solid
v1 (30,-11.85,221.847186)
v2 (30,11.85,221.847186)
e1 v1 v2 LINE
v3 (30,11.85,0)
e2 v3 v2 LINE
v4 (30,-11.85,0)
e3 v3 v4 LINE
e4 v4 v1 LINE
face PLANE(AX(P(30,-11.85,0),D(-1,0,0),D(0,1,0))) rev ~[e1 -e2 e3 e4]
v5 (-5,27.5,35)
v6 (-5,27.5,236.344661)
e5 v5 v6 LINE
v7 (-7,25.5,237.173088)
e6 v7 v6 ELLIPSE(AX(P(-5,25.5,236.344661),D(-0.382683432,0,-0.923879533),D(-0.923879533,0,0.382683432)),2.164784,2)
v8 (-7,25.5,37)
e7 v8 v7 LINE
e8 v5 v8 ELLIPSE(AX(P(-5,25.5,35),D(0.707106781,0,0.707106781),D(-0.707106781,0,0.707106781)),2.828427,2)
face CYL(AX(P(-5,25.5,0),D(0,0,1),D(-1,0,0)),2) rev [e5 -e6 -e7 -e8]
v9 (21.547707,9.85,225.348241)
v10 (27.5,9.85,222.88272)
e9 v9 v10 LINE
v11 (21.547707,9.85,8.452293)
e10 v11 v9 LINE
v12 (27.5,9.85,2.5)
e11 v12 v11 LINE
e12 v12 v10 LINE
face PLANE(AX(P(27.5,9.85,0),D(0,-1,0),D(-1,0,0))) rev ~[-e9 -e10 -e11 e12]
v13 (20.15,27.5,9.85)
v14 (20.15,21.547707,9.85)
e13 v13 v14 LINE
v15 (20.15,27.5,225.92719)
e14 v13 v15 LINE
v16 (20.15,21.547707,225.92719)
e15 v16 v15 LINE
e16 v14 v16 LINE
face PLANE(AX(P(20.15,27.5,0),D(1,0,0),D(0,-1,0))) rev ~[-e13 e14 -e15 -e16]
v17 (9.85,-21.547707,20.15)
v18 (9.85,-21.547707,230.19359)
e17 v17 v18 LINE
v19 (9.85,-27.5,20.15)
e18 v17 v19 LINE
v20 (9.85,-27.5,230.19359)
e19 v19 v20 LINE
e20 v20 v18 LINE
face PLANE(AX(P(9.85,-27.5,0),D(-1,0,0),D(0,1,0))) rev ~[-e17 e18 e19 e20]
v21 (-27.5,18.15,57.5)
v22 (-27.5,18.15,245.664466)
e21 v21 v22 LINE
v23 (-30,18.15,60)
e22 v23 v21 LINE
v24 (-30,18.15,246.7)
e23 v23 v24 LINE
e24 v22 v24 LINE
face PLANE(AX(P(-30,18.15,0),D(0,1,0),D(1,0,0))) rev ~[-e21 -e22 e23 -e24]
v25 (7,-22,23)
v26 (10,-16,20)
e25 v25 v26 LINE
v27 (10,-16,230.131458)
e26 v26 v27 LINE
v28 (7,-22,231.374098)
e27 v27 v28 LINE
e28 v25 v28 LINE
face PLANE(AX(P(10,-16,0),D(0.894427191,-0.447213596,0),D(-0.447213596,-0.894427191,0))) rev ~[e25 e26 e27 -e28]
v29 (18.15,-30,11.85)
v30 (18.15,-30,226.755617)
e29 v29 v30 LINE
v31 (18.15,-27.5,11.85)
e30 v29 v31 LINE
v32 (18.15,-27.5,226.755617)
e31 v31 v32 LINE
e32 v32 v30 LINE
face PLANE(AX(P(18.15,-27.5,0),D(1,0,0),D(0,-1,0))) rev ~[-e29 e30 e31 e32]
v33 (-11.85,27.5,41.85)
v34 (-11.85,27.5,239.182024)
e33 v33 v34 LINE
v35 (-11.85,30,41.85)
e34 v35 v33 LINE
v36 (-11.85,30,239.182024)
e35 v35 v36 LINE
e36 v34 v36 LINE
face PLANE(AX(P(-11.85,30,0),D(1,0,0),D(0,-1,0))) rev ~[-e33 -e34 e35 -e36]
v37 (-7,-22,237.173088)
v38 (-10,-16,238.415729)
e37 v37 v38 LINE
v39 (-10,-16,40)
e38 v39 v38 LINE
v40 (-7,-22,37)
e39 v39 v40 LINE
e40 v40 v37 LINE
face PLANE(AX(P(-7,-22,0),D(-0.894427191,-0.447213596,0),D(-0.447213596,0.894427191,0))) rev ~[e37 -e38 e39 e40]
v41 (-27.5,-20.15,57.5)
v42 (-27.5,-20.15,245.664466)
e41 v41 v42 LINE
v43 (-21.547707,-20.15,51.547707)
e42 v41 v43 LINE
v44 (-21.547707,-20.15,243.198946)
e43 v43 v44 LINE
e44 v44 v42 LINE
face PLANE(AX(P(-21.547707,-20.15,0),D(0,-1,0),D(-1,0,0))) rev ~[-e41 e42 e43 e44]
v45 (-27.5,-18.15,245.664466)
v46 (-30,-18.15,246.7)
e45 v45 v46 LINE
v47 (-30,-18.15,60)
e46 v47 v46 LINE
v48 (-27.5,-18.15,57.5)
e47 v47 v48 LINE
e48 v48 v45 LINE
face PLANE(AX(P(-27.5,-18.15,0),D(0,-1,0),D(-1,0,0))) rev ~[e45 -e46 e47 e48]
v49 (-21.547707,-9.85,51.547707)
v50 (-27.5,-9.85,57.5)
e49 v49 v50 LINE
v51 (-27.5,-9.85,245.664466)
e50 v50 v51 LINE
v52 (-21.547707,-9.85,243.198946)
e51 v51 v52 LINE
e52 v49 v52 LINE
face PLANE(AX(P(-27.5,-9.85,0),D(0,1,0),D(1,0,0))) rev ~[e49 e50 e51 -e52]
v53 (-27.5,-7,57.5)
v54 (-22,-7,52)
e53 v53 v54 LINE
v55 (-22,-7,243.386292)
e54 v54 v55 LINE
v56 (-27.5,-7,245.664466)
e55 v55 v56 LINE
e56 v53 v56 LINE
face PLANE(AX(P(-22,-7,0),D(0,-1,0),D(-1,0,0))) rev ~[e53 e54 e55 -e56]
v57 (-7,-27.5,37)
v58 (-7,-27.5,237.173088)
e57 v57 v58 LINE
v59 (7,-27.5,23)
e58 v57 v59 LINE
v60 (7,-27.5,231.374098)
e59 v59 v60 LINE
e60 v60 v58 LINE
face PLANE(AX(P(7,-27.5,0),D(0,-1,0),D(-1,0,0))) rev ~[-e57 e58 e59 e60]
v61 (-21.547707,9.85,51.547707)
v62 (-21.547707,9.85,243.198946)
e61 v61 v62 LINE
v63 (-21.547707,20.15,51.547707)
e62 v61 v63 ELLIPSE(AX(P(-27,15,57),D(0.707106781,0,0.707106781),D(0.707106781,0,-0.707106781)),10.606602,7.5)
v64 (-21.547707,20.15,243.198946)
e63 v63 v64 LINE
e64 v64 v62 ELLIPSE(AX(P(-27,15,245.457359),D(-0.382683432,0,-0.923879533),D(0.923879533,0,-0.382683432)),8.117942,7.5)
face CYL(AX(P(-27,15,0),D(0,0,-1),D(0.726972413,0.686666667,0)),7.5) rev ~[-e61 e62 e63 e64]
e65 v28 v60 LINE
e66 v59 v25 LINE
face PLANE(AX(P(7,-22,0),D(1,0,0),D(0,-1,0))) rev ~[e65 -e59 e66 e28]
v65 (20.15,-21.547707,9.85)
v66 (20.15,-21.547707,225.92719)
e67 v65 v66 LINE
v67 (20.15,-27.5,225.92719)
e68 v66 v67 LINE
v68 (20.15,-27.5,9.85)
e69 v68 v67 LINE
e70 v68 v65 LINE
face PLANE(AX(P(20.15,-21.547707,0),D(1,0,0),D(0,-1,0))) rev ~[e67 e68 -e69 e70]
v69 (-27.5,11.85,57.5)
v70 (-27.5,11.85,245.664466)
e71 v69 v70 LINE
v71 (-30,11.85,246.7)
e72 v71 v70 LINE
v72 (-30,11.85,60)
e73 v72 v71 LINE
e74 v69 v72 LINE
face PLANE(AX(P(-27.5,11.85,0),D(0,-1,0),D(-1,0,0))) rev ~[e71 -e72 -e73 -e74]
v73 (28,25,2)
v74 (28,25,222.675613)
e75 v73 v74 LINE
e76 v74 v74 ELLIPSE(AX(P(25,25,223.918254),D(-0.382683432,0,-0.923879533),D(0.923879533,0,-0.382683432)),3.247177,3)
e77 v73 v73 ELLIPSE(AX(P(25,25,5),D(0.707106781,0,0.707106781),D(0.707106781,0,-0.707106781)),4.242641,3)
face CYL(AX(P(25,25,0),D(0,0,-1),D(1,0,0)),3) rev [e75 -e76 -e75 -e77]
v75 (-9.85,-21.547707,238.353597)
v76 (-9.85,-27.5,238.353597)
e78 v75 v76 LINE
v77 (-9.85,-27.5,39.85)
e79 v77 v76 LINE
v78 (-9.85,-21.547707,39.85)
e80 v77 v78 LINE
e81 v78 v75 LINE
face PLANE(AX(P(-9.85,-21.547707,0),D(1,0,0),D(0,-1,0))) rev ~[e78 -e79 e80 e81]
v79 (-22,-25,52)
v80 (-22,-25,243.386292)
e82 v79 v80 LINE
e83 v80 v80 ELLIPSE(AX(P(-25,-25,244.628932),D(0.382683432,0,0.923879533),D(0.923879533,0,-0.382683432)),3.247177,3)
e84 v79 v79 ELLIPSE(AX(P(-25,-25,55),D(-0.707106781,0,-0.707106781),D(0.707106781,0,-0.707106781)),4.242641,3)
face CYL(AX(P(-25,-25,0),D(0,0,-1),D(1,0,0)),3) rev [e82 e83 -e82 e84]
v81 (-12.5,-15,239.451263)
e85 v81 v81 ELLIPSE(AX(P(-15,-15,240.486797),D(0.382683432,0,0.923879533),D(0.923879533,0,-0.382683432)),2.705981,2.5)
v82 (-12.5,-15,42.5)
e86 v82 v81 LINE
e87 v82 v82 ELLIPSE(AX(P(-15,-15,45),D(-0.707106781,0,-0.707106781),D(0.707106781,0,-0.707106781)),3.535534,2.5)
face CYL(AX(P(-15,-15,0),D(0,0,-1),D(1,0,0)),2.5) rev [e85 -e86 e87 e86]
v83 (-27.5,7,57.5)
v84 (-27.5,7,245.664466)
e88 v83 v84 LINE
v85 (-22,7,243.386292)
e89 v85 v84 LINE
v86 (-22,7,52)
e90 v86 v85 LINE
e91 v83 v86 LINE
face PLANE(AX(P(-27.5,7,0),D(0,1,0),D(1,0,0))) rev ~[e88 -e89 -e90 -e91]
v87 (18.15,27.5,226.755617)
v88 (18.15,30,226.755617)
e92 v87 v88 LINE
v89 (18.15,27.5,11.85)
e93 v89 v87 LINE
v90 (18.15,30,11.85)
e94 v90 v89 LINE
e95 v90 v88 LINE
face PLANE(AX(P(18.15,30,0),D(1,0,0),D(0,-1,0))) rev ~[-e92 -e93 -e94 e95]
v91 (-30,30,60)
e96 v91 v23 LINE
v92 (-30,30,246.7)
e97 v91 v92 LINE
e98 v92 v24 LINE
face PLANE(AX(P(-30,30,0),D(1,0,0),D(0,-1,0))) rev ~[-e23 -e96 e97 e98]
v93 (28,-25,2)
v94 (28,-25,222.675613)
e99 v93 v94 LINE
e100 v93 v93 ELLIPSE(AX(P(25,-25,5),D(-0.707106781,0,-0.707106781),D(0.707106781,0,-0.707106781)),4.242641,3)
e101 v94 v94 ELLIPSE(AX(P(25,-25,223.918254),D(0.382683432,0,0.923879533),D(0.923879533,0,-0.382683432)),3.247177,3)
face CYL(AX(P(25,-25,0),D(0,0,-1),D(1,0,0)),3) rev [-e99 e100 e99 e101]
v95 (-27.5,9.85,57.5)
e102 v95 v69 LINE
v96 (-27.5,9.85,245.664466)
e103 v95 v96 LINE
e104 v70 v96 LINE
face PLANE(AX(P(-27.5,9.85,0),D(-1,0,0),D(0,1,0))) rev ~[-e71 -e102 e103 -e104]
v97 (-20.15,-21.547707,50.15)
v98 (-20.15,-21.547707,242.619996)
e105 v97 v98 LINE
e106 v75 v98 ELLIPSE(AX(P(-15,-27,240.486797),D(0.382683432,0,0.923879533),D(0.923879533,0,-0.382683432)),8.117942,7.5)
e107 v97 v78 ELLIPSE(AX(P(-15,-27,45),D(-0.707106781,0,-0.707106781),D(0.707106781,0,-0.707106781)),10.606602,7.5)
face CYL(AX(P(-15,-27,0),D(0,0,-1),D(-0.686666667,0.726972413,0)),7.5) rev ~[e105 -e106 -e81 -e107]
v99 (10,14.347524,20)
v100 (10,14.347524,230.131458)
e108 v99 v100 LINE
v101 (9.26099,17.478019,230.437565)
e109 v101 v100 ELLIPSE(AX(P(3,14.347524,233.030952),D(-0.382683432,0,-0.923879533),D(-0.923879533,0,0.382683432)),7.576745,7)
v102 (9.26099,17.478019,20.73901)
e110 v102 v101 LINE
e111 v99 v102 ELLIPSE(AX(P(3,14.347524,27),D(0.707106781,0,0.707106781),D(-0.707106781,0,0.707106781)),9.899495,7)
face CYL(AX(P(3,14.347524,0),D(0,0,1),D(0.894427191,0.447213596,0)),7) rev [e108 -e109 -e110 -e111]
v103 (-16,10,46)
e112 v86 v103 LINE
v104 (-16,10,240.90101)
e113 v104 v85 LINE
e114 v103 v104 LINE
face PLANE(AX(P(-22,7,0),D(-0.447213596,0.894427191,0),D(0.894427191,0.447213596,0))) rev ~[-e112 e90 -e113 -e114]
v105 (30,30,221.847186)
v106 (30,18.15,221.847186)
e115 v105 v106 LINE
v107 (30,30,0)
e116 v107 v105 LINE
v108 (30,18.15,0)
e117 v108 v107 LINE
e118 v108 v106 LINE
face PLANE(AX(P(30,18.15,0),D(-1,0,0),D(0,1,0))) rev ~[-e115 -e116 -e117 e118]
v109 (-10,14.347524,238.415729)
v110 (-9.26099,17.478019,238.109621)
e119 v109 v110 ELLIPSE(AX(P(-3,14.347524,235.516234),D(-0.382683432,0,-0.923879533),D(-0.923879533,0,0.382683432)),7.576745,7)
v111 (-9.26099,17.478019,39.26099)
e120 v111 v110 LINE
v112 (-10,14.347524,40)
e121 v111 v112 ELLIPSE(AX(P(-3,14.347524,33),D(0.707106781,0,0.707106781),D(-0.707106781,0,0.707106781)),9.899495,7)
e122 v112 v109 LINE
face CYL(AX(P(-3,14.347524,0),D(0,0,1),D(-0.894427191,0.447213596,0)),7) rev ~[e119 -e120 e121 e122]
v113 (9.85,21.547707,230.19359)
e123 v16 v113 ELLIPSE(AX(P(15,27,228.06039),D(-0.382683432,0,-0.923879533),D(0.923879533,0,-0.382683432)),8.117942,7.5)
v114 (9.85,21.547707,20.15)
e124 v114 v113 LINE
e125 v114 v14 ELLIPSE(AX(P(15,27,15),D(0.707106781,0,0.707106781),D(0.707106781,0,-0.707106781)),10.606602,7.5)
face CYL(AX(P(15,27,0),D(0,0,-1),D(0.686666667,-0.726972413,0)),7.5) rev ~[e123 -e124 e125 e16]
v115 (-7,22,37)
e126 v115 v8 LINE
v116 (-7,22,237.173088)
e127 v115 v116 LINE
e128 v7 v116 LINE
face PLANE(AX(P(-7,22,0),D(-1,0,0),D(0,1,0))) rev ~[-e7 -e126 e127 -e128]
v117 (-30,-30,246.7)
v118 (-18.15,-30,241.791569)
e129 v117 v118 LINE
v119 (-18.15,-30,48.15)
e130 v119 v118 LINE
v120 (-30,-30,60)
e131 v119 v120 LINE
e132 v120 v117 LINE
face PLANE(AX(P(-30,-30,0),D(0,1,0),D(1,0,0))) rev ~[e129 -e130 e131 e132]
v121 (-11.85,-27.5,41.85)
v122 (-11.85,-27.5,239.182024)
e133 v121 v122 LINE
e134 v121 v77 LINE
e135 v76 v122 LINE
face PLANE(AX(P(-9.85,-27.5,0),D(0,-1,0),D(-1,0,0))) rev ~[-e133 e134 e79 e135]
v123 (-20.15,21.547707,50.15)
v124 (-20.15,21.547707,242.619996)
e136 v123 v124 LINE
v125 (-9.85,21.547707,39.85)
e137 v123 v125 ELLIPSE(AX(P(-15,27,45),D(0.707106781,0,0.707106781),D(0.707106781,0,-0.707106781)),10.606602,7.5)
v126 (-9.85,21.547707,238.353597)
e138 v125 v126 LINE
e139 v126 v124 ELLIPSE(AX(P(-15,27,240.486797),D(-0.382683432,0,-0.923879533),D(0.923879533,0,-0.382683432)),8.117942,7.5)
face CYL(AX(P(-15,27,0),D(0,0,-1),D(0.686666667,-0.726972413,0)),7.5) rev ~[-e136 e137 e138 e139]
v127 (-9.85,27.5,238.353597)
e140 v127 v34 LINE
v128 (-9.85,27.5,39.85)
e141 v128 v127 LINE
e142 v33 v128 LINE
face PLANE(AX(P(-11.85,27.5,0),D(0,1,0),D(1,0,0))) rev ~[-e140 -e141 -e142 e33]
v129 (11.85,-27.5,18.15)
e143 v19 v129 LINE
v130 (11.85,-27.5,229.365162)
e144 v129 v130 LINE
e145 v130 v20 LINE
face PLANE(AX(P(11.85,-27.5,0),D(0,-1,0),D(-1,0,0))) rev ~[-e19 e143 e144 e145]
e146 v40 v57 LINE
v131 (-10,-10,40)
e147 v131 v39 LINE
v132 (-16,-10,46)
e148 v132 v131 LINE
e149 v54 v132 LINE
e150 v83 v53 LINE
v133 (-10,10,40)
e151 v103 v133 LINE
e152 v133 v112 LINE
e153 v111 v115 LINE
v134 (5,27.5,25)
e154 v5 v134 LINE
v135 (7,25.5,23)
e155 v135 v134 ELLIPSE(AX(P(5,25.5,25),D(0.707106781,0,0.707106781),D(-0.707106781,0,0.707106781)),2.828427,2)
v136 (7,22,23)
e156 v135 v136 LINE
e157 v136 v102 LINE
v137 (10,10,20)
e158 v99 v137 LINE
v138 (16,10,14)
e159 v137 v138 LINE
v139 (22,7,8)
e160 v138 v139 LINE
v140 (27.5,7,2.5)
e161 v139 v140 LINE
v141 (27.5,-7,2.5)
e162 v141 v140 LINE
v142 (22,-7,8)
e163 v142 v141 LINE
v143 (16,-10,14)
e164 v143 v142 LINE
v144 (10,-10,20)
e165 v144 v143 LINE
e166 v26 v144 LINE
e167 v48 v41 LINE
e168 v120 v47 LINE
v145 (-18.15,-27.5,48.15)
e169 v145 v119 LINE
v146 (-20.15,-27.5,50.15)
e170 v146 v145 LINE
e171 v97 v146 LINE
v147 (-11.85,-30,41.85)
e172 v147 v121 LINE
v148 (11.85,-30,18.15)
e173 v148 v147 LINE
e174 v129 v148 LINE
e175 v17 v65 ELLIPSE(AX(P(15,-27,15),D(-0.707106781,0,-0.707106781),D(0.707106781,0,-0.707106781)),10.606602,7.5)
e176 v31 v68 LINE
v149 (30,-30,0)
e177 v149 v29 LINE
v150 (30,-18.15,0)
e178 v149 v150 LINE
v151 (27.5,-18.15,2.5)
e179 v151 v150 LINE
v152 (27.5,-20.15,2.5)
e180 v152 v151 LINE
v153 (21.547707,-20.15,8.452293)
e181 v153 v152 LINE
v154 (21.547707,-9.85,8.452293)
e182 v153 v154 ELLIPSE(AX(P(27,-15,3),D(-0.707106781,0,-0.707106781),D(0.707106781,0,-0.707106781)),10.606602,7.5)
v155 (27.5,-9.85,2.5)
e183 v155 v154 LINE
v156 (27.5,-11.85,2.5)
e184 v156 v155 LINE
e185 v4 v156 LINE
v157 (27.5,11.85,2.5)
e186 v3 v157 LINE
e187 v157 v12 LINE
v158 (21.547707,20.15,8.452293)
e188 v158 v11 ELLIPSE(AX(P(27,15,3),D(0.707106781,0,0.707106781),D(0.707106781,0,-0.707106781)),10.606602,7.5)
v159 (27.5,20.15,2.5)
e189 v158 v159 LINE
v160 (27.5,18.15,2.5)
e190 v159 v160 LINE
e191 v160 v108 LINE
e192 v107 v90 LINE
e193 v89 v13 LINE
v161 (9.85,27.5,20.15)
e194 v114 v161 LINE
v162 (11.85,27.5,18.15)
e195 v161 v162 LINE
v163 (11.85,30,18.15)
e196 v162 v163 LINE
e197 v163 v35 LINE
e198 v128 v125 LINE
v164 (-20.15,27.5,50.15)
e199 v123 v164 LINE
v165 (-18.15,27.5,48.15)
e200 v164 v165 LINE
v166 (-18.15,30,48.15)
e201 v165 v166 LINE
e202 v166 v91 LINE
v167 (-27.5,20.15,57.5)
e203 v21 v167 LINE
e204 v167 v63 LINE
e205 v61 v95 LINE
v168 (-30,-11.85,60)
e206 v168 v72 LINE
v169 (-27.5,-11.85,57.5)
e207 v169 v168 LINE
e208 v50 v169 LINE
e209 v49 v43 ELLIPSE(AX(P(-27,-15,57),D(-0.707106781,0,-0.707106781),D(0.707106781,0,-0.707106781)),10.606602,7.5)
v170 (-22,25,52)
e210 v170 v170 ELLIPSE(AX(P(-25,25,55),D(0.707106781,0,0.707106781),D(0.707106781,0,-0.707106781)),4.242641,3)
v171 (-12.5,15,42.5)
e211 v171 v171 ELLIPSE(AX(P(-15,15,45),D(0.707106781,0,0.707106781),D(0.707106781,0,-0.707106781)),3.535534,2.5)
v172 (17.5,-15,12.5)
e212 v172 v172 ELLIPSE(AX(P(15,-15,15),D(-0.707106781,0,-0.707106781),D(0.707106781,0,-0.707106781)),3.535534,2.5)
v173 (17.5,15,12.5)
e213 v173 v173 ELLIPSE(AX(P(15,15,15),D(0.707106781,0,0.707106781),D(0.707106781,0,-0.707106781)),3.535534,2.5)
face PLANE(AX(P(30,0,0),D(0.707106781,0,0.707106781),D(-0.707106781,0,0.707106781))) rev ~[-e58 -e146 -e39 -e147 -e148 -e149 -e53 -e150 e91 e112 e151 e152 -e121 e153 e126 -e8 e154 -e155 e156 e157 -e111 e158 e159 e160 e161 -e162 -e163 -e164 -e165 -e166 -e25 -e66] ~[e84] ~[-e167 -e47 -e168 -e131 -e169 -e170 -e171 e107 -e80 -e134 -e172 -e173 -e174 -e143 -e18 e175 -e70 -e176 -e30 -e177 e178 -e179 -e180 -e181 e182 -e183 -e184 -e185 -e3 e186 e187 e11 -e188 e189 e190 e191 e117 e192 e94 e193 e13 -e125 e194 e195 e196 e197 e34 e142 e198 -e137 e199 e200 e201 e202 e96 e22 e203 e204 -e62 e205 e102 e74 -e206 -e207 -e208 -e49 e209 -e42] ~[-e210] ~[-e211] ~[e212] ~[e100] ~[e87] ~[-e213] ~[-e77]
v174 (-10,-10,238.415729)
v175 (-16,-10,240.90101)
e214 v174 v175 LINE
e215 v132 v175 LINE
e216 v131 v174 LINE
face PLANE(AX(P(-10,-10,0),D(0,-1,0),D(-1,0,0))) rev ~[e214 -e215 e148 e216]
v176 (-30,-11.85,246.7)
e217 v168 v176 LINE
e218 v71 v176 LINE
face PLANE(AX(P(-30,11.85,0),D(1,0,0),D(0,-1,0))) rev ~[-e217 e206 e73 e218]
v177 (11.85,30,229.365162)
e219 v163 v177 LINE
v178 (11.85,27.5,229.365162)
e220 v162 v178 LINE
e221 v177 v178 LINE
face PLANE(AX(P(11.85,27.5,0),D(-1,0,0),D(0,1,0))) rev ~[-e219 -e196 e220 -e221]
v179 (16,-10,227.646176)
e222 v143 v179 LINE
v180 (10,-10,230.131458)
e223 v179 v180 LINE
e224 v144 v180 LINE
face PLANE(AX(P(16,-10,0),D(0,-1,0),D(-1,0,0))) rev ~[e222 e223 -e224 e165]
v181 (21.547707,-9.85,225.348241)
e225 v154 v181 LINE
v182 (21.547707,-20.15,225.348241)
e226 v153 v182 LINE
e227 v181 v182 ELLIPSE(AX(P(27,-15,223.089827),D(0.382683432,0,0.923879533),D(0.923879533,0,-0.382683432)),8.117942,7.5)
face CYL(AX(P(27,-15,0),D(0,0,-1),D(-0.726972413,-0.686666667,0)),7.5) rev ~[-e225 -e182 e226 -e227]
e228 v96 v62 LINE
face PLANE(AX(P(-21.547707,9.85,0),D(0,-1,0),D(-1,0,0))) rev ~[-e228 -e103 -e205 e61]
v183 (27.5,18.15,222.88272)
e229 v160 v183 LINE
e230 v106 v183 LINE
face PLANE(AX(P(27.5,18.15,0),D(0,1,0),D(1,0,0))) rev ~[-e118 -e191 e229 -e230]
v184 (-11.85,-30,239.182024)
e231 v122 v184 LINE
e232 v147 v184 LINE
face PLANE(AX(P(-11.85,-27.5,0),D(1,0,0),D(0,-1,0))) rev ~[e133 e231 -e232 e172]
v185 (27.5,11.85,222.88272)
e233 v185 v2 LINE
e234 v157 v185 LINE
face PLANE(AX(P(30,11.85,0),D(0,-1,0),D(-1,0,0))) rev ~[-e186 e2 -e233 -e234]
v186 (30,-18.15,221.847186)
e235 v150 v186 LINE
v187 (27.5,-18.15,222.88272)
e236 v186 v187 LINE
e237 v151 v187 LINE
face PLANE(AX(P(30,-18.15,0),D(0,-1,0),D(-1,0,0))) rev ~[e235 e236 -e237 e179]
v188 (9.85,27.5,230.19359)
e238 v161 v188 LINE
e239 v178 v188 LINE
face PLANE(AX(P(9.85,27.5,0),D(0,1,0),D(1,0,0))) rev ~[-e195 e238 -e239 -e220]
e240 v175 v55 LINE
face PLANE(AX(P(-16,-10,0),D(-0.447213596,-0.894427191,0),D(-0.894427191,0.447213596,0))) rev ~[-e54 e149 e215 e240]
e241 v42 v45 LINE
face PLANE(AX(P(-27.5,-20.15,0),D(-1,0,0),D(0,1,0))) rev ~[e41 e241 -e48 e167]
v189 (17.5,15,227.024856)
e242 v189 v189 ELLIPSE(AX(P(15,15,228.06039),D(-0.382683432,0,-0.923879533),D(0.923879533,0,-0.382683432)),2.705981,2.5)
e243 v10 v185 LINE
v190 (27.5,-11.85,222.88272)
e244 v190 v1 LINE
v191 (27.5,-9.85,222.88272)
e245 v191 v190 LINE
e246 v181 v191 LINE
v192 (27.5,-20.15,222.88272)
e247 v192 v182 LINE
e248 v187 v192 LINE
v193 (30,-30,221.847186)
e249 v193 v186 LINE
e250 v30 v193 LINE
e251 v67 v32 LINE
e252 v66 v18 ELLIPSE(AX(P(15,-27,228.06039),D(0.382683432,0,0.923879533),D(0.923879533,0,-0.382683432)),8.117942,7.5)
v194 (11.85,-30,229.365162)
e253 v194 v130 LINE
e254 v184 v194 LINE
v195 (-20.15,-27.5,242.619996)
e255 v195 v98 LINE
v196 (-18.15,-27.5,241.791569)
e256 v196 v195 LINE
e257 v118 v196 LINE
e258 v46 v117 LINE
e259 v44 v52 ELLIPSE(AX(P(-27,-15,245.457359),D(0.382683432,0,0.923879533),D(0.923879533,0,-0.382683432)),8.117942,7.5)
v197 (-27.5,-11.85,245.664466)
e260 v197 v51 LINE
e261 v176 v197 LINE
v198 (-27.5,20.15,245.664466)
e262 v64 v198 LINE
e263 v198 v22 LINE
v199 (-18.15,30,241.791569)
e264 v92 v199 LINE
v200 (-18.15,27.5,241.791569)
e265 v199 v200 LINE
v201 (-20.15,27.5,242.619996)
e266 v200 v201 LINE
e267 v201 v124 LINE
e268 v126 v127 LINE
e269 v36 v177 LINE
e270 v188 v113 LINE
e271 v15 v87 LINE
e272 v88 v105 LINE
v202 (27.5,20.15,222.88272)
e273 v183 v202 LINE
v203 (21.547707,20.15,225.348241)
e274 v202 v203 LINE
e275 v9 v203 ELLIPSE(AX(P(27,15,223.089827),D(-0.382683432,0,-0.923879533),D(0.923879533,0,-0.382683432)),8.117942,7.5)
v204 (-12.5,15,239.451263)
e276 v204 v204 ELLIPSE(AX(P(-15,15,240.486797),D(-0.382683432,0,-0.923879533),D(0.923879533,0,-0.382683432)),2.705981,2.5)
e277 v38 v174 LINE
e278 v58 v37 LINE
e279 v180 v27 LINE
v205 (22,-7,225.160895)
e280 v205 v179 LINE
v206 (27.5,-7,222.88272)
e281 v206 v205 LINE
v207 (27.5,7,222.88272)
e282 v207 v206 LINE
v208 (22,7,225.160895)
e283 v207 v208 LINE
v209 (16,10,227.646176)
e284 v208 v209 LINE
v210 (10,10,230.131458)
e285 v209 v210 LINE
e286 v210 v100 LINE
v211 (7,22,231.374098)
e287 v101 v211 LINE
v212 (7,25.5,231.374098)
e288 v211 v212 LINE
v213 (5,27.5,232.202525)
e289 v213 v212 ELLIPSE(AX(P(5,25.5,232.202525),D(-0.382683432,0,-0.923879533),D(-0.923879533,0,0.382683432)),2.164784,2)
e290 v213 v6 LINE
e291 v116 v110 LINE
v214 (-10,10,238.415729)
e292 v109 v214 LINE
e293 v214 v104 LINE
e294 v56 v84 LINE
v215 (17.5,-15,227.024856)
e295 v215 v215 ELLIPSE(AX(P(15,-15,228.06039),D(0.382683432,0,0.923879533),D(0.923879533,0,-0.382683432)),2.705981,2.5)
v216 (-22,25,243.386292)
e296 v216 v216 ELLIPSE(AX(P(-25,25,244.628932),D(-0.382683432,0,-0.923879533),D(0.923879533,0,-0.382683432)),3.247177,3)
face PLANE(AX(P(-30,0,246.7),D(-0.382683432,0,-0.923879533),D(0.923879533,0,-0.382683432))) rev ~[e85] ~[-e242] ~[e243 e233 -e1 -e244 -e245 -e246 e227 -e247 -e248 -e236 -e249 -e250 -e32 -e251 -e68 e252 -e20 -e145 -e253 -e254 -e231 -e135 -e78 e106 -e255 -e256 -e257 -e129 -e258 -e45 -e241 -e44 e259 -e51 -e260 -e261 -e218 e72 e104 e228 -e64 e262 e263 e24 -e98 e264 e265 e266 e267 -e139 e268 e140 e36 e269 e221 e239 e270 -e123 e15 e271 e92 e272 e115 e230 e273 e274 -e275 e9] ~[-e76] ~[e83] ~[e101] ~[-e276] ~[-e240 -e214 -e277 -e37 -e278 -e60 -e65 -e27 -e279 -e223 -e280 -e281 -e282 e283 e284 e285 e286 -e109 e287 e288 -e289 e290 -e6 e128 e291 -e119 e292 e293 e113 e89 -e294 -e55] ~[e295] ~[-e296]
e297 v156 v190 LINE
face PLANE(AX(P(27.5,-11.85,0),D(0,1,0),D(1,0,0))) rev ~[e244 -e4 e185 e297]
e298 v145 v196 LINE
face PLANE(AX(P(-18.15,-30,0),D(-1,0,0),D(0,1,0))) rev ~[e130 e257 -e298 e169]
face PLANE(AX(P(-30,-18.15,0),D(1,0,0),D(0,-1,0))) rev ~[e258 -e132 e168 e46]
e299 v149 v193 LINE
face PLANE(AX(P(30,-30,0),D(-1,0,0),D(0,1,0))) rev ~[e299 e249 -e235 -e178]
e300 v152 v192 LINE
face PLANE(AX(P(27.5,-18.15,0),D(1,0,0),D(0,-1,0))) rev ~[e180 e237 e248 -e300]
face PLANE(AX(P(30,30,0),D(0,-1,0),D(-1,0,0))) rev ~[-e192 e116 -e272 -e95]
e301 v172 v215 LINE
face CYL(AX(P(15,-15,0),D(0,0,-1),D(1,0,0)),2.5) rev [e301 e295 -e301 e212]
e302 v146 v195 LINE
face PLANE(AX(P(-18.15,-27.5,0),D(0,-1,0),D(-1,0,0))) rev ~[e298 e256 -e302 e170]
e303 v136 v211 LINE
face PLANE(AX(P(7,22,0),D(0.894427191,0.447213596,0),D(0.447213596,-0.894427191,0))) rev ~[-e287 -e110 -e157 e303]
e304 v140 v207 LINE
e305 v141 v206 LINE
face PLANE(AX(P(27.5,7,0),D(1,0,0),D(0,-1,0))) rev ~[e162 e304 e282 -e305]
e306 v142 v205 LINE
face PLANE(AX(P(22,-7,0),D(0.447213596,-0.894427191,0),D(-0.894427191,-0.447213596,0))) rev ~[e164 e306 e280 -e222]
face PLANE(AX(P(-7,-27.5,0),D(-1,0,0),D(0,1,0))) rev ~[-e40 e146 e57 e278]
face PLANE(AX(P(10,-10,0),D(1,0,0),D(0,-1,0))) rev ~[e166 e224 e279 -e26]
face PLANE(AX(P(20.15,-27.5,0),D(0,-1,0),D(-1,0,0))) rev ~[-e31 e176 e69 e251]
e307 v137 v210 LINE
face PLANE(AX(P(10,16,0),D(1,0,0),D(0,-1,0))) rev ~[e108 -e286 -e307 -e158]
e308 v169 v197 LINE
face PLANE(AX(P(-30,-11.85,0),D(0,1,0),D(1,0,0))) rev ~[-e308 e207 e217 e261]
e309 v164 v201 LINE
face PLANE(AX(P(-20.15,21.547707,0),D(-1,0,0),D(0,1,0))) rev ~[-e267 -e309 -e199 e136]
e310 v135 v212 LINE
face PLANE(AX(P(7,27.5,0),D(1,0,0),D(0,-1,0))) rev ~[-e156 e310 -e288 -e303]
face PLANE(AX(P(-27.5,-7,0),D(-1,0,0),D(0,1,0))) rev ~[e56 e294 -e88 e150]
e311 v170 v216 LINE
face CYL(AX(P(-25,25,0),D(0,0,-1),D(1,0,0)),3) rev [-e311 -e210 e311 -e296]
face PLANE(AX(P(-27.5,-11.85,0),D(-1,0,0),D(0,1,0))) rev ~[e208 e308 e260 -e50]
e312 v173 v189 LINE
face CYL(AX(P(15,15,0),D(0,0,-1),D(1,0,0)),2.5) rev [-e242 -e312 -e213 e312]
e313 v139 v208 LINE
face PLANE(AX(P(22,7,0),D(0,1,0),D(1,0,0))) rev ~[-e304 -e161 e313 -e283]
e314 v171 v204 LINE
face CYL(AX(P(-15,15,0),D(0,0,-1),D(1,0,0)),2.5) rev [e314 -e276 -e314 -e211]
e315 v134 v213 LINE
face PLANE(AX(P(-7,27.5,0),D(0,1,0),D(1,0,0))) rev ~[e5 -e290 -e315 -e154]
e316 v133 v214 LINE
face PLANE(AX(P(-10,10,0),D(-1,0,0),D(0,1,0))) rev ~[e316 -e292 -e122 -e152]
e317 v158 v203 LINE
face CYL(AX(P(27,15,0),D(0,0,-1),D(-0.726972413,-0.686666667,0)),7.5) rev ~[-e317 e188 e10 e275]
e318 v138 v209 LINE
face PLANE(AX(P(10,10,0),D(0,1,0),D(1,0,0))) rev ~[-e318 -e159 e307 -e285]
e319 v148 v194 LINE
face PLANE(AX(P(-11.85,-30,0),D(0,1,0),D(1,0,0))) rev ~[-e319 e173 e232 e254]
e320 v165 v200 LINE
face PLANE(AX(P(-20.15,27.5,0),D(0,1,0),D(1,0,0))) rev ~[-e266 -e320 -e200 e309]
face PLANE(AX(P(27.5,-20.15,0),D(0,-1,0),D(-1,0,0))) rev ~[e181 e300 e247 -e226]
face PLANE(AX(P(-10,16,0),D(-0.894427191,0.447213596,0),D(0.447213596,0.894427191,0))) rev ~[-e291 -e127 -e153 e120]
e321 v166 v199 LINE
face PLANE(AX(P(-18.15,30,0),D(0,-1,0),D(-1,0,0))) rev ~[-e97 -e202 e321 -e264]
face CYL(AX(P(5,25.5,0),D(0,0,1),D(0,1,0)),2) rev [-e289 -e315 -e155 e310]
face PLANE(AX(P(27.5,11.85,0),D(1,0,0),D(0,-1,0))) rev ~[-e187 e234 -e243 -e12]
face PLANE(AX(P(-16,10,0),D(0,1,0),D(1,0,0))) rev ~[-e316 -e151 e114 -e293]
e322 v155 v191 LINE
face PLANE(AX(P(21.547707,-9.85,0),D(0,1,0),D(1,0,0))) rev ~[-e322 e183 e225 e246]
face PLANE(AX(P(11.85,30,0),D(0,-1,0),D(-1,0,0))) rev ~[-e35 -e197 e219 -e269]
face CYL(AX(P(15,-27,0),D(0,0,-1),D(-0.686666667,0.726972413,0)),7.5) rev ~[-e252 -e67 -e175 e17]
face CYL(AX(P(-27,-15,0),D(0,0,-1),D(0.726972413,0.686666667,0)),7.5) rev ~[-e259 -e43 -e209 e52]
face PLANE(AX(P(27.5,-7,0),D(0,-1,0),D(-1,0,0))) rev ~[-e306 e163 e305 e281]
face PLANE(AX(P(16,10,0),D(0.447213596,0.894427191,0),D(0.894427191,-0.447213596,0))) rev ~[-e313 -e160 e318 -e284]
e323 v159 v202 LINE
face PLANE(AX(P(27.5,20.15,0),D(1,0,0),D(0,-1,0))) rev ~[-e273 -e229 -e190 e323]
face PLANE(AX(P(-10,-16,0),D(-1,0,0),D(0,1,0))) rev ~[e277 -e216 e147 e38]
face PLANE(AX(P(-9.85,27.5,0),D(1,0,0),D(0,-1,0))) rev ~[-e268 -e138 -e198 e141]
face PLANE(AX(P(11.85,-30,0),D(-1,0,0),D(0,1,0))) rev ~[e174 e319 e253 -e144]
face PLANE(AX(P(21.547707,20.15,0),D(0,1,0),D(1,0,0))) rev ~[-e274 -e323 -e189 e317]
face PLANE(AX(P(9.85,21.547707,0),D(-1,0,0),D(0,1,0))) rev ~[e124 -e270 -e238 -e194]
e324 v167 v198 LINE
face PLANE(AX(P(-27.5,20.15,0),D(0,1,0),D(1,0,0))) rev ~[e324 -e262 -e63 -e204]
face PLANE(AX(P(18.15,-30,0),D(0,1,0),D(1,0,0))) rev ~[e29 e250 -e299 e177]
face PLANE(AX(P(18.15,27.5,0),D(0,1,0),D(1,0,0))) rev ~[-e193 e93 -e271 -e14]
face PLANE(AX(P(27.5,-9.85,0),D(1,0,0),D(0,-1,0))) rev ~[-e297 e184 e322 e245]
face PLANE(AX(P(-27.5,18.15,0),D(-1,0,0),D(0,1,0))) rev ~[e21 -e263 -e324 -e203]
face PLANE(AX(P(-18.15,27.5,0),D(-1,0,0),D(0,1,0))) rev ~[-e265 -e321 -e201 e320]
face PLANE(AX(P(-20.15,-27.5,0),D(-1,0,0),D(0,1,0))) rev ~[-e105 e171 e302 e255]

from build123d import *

# Parameters (mm, degrees)
F0_R          = 3
F0_R_2        = 2.5
F1_DEPTH      = 246.7
F2_R          = 2
F3_R          = 7
F6_DEPTH      = 30
F6_DEPTH_BACK = 30


# Not quite as in the source:
# - a feature names something its author has since deleted; it is built from what else it names


with BuildPart() as f1:
    # F0 (on Top) → F1 (new body)
    with BuildSketch(Plane.XY):
        with BuildLine():
            Line((18.15, -30), (30, -30))
            Line((30, -30), (30, -18.15))
            Line((30, -18.15), (27.5, -18.15))
            Line((27.5, -18.15), (27.5, -20.15))
            Line((27.5, -20.15), (21.5477069044, -20.15))
            ThreePointArc((21.5477069044, -20.15), (19.5, -15), (21.5477069044, -9.85))
            Line((21.5477069044, -9.85), (27.5, -9.85))
            Line((27.5, -9.85), (27.5, -11.85))
            Line((27.5, -11.85), (30, -11.85))
            Line((30, -11.85), (30, 11.85))
            Line((30, 11.85), (27.5, 11.85))
            Line((27.5, 11.85), (27.5, 9.85))
            Line((27.5, 9.85), (21.5477069044, 9.85))
            ThreePointArc((21.5477069044, 9.85), (19.5, 15), (21.5477069044, 20.15))
            Line((21.5477069044, 20.15), (27.5, 20.15))
            Line((27.5, 20.15), (27.5, 18.15))
            Line((27.5, 18.15), (30, 18.15))
            Line((30, 18.15), (30, 30))
            Line((30, 30), (18.15, 30))
            Line((18.15, 30), (18.15, 27.5))
            Line((18.15, 27.5), (20.15, 27.5))
            Line((20.15, 27.5), (20.15, 21.5477069044))
            ThreePointArc((20.15, 21.5477069044), (15, 19.5), (9.85, 21.5477069044))
            Line((9.85, 21.5477069044), (9.85, 27.5))
            Line((9.85, 27.5), (11.85, 27.5))
            Line((11.85, 27.5), (11.85, 30))
            Line((11.85, 30), (-11.85, 30))
            Line((-11.85, 30), (-11.85, 27.5))
            Line((-11.85, 27.5), (-9.85, 27.5))
            Line((-9.85, 27.5), (-9.85, 21.5477069044))
            ThreePointArc((-9.85, 21.5477069044), (-15, 19.5), (-20.15, 21.5477069044))
            Line((-20.15, 21.5477069044), (-20.15, 27.5))
            Line((-20.15, 27.5), (-18.15, 27.5))
            Line((-18.15, 27.5), (-18.15, 30))
            Line((-18.15, 30), (-30, 30))
            Line((-30, 30), (-30, 18.15))
            Line((-30, 18.15), (-27.5, 18.15))
            Line((-27.5, 18.15), (-27.5, 20.15))
            Line((-27.5, 20.15), (-21.5477069044, 20.15))
            ThreePointArc((-21.5477069044, 20.15), (-19.5, 15), (-21.5477069044, 9.85))
            Line((-21.5477069044, 9.85), (-27.5, 9.85))
            Line((-27.5, 9.85), (-27.5, 11.85))
            Line((-27.5, 11.85), (-30, 11.85))
            Line((-30, 11.85), (-30, -11.85))
            Line((-30, -11.85), (-27.5, -11.85))
            Line((-27.5, -11.85), (-27.5, -9.85))
            Line((-27.5, -9.85), (-21.5477069044, -9.85))
            ThreePointArc((-21.5477069044, -9.85), (-19.5, -15), (-21.5477069044, -20.15))
            Line((-21.5477069044, -20.15), (-27.5, -20.15))
            Line((-27.5, -20.15), (-27.5, -18.15))
            Line((-27.5, -18.15), (-30, -18.15))
            Line((-30, -18.15), (-30, -30))
            Line((-30, -30), (-18.15, -30))
            Line((-18.15, -30), (-18.15, -27.5))
            Line((-18.15, -27.5), (-20.15, -27.5))
            Line((-20.15, -27.5), (-20.15, -21.5477069044))
            ThreePointArc((-20.15, -21.5477069044), (-15, -19.5), (-9.85, -21.5477069044))
            Line((-9.85, -21.5477069044), (-9.85, -27.5))
            Line((-9.85, -27.5), (-11.85, -27.5))
            Line((-11.85, -27.5), (-11.85, -30))
            Line((-11.85, -30), (11.85, -30))
            Line((11.85, -30), (11.85, -27.5))
            Line((11.85, -27.5), (9.85, -27.5))
            Line((9.85, -27.5), (9.85, -21.5477069044))
            ThreePointArc((9.85, -21.5477069044), (15, -19.5), (20.15, -21.5477069044))
            Line((20.15, -21.5477069044), (20.15, -27.5))
            Line((20.15, -27.5), (18.15, -27.5))
            Line((18.15, -27.5), (18.15, -30))
        make_face()
        with Locations((-25, -25)):
            Circle(F0_R, mode=Mode.SUBTRACT)
        with Locations((-15, -15)):
            Circle(F0_R_2, mode=Mode.SUBTRACT)
        with Locations((25, -25)):
            Circle(F0_R, mode=Mode.SUBTRACT)
        with Locations((15, -15)):
            Circle(F0_R_2, mode=Mode.SUBTRACT)
        with Locations((-25, 25)):
            Circle(F0_R, mode=Mode.SUBTRACT)
        with Locations((-15, 15)):
            Circle(F0_R_2, mode=Mode.SUBTRACT)
        Polygon((-7, 22), (-7, 27.5), (0, 27.5), (7, 27.5), (7, 22), (10, 16), (10, 10), (16, 10), (22, 7), (27.5, 7), (27.5, 0), (27.5, -7), (22, -7), (16, -10), (10, -10), (10, -16), (7, -22), (7, -27.5), (0, -27.5), (-7, -27.5), (-7, -22), (-10, -16), (-10, -10), (-16, -10), (-22, -7), (-27.5, -7), (-27.5, 0), (-27.5, 7), (-22, 7), (-16, 10), (-10, 10), (-10, 16), align=None, mode=Mode.SUBTRACT)
        with Locations((15, 15)):
            Circle(F0_R_2, mode=Mode.SUBTRACT)
        with Locations((25, 25)):
            Circle(F0_R, mode=Mode.SUBTRACT)
    extrude(amount=F1_DEPTH)

    # F2
    f2_edges = [f1.edges().sort_by_distance(p)[0] for p in [
        (-7, 27.5, 123.35),
        (7, 27.5, 123.35),
    ]]
    fillet(f2_edges, radius=F2_R)

    # F3
    f3_edges = [f1.edges().sort_by_distance(p)[0] for p in [
        (-10, 16, 123.35),
        (10, 16, 123.35),
    ]]
    fillet(f3_edges, radius=F3_R)

    # F5 (on Front) → F6 (cut, two sides)
    with BuildSketch(Plane.XZ) as f6_sk:
        Polygon((-21.4844248466, -51.4844248466), (30, 0), (-30.7442165391, 60.7442165391), (-82.2286413857, 9.2597916926), align=None)
        Polygon((69.921577374, 205.311127478), (91.4664718921, 257.3251040235), (-8.4551054819, 298.7139765456), (-30, 246.7), align=None)
    extrude(amount=F6_DEPTH, mode=Mode.SUBTRACT)
    extrude(f6_sk.sketch, amount=-F6_DEPTH_BACK, mode=Mode.SUBTRACT)


solid = f1.part
